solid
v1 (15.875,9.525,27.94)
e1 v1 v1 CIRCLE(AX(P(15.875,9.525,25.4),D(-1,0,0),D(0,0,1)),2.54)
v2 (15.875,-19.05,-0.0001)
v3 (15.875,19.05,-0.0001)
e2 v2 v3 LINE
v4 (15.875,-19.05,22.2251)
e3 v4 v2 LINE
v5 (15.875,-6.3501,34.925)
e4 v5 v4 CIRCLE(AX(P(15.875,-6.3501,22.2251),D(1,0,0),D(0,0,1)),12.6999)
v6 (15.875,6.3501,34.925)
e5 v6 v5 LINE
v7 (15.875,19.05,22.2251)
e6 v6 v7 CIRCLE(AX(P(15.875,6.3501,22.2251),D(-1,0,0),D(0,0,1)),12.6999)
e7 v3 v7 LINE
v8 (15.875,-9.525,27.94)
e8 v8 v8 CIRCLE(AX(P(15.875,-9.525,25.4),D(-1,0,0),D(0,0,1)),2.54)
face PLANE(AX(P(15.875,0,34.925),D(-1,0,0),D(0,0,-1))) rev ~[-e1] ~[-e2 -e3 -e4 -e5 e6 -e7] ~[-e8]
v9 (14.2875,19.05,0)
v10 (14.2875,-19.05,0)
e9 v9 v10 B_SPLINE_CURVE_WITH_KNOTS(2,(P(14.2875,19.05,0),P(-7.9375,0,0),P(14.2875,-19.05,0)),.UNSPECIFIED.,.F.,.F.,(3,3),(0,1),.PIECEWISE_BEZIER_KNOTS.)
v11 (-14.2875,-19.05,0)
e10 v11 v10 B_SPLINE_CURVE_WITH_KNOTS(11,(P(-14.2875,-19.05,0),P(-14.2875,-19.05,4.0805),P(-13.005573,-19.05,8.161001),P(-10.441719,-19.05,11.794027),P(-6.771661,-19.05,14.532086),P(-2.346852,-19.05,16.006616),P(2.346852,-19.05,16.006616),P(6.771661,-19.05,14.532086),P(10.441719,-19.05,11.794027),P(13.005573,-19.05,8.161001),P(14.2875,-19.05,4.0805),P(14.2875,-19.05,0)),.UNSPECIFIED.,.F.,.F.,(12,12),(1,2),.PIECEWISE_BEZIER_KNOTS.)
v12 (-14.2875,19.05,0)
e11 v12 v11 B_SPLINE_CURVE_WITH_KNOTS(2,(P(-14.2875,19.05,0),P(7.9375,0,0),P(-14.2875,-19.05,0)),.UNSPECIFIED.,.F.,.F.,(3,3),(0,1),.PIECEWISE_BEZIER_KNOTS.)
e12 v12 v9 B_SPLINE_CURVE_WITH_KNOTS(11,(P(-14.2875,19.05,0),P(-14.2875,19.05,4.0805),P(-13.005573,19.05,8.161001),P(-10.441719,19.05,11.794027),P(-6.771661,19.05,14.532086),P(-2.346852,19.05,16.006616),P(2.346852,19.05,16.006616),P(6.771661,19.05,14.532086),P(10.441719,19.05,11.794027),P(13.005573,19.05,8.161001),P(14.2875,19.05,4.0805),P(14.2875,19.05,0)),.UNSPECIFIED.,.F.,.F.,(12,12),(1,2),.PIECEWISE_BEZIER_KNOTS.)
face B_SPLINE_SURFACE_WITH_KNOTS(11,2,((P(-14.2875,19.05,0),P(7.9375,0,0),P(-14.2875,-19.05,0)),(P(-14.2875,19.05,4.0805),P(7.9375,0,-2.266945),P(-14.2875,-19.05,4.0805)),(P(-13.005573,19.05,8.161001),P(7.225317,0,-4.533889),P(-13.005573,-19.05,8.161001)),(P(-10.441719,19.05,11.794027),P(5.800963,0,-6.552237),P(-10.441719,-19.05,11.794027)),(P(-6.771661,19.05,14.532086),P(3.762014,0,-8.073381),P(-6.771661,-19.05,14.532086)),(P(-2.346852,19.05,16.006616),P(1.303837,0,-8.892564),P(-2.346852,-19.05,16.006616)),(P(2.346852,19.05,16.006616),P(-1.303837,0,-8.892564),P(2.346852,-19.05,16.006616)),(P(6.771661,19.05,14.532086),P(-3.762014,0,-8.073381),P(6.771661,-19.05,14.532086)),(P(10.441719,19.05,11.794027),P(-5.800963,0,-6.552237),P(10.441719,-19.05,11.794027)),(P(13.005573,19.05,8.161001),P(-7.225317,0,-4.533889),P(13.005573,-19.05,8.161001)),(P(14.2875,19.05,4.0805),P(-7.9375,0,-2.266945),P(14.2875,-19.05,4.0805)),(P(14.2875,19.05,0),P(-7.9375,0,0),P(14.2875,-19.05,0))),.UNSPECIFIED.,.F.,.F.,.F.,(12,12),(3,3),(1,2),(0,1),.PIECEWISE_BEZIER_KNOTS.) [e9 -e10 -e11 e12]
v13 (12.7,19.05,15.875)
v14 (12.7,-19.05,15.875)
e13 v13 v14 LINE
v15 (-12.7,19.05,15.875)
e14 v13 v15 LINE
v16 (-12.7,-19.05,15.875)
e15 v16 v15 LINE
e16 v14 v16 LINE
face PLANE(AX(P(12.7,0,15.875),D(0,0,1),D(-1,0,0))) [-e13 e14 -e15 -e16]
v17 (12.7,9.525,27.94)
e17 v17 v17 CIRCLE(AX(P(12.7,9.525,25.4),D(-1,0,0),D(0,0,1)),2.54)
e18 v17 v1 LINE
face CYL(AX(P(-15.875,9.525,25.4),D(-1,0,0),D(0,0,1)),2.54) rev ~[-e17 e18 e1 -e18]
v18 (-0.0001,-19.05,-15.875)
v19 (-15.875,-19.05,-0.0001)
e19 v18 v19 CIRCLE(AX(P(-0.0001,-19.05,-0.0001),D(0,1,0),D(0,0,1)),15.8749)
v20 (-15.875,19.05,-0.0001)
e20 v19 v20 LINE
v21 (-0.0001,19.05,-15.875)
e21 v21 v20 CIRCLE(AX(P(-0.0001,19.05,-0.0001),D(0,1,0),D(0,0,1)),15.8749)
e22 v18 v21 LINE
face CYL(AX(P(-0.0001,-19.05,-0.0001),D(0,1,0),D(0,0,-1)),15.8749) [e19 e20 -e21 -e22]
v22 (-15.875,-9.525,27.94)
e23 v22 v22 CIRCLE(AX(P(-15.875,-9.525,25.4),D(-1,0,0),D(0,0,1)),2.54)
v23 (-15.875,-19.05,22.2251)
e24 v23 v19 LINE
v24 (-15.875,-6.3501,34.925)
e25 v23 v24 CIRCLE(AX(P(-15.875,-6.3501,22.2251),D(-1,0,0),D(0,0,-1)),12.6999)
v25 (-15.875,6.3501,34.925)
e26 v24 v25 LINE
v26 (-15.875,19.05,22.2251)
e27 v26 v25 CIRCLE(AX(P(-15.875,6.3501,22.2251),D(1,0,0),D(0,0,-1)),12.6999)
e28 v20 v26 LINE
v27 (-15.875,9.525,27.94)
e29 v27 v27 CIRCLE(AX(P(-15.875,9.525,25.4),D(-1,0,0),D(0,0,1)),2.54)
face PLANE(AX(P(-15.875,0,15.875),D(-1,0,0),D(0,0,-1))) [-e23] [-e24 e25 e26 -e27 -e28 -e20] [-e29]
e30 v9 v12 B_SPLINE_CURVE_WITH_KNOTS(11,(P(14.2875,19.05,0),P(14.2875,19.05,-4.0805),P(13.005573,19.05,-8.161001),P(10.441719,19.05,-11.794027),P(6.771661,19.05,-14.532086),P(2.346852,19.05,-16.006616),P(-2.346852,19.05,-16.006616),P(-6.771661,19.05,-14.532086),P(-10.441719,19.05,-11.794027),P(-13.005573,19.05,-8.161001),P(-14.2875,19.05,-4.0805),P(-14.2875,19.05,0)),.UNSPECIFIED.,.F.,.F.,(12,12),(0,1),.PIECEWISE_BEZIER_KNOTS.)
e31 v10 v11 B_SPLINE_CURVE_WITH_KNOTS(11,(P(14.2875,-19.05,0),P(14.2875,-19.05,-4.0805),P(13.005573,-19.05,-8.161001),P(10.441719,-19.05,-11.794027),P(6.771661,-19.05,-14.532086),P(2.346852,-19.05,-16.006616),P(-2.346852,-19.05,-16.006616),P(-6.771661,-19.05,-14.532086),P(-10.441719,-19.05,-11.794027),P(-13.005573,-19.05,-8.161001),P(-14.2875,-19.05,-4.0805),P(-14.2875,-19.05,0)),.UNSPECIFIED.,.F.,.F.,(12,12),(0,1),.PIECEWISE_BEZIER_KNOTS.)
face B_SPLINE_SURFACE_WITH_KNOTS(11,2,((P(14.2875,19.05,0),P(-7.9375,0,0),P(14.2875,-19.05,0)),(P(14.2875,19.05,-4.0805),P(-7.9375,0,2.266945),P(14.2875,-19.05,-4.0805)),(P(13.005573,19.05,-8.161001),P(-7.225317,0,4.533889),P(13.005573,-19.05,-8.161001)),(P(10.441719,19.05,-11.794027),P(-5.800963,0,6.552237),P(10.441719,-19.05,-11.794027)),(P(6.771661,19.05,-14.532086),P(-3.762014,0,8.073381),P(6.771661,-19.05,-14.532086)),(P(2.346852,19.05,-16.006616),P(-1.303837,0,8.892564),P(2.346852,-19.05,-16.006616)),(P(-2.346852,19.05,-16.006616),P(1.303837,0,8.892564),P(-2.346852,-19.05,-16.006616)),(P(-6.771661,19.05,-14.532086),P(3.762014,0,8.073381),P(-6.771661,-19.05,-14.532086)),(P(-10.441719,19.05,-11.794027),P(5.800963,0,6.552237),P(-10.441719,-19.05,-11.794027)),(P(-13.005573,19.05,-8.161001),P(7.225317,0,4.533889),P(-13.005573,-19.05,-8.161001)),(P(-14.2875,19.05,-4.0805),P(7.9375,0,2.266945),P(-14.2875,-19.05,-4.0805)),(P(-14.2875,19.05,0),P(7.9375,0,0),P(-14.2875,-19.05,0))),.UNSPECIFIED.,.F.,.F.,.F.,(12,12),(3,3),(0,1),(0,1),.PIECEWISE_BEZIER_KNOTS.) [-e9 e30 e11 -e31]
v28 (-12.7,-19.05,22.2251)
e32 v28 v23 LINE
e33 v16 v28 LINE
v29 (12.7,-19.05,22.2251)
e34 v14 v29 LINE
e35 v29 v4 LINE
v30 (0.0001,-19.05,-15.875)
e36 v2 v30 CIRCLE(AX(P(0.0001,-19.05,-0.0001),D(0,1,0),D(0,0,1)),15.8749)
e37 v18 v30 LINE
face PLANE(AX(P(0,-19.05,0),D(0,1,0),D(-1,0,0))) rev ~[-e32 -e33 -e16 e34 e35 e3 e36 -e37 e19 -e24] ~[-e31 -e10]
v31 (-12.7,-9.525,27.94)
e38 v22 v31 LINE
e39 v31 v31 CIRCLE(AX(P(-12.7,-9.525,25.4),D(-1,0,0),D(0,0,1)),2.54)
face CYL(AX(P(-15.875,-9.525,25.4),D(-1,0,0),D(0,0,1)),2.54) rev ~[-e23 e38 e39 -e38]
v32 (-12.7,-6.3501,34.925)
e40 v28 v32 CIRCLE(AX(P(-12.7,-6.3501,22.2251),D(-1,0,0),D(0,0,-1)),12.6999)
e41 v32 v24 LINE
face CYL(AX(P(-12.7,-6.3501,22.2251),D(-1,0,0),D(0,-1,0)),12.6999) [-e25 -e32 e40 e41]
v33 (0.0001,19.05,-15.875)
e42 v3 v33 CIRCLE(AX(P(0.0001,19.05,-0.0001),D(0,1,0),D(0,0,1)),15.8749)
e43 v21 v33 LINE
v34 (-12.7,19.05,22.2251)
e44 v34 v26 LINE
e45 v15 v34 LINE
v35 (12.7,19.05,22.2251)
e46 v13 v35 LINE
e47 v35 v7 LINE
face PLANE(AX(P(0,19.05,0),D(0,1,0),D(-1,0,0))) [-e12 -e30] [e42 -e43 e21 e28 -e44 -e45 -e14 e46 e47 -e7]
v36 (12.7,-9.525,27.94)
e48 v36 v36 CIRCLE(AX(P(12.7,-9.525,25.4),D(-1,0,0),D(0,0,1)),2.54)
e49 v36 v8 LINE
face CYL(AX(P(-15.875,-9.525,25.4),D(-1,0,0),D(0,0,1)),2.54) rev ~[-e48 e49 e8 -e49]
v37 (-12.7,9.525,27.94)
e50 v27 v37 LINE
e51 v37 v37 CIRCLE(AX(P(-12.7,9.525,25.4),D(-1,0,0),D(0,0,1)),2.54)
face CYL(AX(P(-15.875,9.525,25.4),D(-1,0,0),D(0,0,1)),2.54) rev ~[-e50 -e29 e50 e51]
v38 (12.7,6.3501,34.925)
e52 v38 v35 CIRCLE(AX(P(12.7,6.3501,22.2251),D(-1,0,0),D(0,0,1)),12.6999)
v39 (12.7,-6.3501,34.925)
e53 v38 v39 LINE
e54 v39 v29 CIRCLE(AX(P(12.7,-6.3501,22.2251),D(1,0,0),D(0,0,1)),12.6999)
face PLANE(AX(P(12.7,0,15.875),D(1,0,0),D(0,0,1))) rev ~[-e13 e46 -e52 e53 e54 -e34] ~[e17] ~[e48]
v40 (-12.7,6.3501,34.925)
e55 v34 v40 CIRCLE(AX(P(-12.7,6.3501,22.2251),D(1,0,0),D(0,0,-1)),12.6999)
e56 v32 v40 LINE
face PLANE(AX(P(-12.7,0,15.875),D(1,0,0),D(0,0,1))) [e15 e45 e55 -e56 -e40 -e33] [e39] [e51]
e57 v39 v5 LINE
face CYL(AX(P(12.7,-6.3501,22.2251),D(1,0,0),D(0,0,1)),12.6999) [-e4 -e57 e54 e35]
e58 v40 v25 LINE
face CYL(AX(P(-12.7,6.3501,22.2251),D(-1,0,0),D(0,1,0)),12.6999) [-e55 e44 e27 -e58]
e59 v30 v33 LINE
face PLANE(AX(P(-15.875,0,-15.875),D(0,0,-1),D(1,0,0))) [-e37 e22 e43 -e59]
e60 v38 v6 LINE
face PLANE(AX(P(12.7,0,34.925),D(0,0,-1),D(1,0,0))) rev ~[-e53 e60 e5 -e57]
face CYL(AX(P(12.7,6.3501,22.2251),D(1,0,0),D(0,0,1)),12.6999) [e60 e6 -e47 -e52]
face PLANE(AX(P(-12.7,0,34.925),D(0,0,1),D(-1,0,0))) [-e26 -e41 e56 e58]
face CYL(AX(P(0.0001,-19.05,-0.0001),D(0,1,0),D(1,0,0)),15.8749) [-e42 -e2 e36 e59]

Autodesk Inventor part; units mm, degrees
ref_plane "YZ Plane" through (0, 0, 0) normal (1, 0, 0) x (0, 1, 0)
ref_plane "XZ Plane" through (0, 0, 0) normal (0, 1, 0) x (-1, 0, 0)
ref_plane "XY Plane" through (0, 0, 0) normal (0, 0, 1) x (1, 0, 0)
sketch "Sketch1" plane through (0, 0, 0) normal (0, 1, 0) x (-1, 0, 0)
  line L0 (-15.875, 15.875) -> (15.875, 15.875)
  line L1 (15.875, 15.875) -> (15.875, -15.875)
  line L2 (15.875, -15.875) -> (-15.875, -15.875)
  line L3 (-15.875, -15.875) -> (-15.875, 15.875)
  line L4 (-15.875, 15.875) -> (15.875, -15.875) construction
  line L5 (15.875, 15.875) -> (-15.875, -15.875) construction
  line L6 (-15.875, 15.875) -> (-12.7, 15.875)
  line L7 (-12.7, 15.875) -> (-12.7, 34.925)
  line L8 (-12.7, 34.925) -> (-15.875, 34.925)
  line L9 (-15.875, 34.925) -> (-15.875, 15.875)
  line L10 (15.875, 15.875) -> (12.7, 15.875)
  line L11 (12.7, 15.875) -> (12.7, 34.925)
  line L12 (12.7, 34.925) -> (15.875, 34.925)
  line L13 (15.875, 34.925) -> (15.875, 15.875)
  point P0 (0, 0)
  dimension "d0" = 31.75
  dimension "d13" = 25.4
  dimension "d14" = 19.05
extrude "Extrusion1" add sketch "Sketch1" along normal mid plane 38.1
sketch "Sketch2" plane through (0, 0, 0) normal (0, 1, 0) x (-1, 0, 0)
  circle A0 centre (0, 0) radius 3.175
  dimension "d3" = 6.35
sketch "Sketch3" plane through (0, 19.05, 0) normal (0, 1, 0) x (1, 0, 0)
  circle A0 centre (0, 0) radius 14.2875
  dimension "d4" = 28.575
sketch "Sketch4" plane through (0, -19.05, 0) normal (0, -1, 0) x (1, 0, 0)
  circle A0 centre (0, 0) radius 14.2875
  dimension "d5" = 28.575
loft "Loft1" cut profiles "Sketch3", "Sketch2", "Sketch4"
fillet "Fillet1" radius 15.875 2 edges at (15.875, 0, -15.875) (-15.875, 0, -15.875)
fillet "Fillet1" radius 12.7 4 edges at (14.2875, 19.05, 34.925) (14.2875, -19.05, 34.925) (-14.2875, 19.05, 34.925) (-14.2875, -19.05, 34.925)
sketch "Sketch5" plane through (-15.875, -19.05, 0) normal (-1, 0, 0) x (0, 0, 1)
  line L0 (15.875, 0) -> (15.875, 38.1) construction
  line L1 (15.875, 0) -> (15.875, 38.1) construction
  circle A0 centre (25.4, 9.525) radius 2.54
  circle A1 centre (25.4, 28.575) radius 2.54
  line L2 (25.4, 9.525) -> (25.4, 28.575) construction
  line L3 (25.4, 19.05) -> (0, 19.05) construction
  dimension "d16" = 5.08
  dimension "d17" = 9.525
  dimension "d18" = 19.05
extrude "Extrusion2" cut sketch "Sketch5" against normal through all
properties part number "climb pull point"
